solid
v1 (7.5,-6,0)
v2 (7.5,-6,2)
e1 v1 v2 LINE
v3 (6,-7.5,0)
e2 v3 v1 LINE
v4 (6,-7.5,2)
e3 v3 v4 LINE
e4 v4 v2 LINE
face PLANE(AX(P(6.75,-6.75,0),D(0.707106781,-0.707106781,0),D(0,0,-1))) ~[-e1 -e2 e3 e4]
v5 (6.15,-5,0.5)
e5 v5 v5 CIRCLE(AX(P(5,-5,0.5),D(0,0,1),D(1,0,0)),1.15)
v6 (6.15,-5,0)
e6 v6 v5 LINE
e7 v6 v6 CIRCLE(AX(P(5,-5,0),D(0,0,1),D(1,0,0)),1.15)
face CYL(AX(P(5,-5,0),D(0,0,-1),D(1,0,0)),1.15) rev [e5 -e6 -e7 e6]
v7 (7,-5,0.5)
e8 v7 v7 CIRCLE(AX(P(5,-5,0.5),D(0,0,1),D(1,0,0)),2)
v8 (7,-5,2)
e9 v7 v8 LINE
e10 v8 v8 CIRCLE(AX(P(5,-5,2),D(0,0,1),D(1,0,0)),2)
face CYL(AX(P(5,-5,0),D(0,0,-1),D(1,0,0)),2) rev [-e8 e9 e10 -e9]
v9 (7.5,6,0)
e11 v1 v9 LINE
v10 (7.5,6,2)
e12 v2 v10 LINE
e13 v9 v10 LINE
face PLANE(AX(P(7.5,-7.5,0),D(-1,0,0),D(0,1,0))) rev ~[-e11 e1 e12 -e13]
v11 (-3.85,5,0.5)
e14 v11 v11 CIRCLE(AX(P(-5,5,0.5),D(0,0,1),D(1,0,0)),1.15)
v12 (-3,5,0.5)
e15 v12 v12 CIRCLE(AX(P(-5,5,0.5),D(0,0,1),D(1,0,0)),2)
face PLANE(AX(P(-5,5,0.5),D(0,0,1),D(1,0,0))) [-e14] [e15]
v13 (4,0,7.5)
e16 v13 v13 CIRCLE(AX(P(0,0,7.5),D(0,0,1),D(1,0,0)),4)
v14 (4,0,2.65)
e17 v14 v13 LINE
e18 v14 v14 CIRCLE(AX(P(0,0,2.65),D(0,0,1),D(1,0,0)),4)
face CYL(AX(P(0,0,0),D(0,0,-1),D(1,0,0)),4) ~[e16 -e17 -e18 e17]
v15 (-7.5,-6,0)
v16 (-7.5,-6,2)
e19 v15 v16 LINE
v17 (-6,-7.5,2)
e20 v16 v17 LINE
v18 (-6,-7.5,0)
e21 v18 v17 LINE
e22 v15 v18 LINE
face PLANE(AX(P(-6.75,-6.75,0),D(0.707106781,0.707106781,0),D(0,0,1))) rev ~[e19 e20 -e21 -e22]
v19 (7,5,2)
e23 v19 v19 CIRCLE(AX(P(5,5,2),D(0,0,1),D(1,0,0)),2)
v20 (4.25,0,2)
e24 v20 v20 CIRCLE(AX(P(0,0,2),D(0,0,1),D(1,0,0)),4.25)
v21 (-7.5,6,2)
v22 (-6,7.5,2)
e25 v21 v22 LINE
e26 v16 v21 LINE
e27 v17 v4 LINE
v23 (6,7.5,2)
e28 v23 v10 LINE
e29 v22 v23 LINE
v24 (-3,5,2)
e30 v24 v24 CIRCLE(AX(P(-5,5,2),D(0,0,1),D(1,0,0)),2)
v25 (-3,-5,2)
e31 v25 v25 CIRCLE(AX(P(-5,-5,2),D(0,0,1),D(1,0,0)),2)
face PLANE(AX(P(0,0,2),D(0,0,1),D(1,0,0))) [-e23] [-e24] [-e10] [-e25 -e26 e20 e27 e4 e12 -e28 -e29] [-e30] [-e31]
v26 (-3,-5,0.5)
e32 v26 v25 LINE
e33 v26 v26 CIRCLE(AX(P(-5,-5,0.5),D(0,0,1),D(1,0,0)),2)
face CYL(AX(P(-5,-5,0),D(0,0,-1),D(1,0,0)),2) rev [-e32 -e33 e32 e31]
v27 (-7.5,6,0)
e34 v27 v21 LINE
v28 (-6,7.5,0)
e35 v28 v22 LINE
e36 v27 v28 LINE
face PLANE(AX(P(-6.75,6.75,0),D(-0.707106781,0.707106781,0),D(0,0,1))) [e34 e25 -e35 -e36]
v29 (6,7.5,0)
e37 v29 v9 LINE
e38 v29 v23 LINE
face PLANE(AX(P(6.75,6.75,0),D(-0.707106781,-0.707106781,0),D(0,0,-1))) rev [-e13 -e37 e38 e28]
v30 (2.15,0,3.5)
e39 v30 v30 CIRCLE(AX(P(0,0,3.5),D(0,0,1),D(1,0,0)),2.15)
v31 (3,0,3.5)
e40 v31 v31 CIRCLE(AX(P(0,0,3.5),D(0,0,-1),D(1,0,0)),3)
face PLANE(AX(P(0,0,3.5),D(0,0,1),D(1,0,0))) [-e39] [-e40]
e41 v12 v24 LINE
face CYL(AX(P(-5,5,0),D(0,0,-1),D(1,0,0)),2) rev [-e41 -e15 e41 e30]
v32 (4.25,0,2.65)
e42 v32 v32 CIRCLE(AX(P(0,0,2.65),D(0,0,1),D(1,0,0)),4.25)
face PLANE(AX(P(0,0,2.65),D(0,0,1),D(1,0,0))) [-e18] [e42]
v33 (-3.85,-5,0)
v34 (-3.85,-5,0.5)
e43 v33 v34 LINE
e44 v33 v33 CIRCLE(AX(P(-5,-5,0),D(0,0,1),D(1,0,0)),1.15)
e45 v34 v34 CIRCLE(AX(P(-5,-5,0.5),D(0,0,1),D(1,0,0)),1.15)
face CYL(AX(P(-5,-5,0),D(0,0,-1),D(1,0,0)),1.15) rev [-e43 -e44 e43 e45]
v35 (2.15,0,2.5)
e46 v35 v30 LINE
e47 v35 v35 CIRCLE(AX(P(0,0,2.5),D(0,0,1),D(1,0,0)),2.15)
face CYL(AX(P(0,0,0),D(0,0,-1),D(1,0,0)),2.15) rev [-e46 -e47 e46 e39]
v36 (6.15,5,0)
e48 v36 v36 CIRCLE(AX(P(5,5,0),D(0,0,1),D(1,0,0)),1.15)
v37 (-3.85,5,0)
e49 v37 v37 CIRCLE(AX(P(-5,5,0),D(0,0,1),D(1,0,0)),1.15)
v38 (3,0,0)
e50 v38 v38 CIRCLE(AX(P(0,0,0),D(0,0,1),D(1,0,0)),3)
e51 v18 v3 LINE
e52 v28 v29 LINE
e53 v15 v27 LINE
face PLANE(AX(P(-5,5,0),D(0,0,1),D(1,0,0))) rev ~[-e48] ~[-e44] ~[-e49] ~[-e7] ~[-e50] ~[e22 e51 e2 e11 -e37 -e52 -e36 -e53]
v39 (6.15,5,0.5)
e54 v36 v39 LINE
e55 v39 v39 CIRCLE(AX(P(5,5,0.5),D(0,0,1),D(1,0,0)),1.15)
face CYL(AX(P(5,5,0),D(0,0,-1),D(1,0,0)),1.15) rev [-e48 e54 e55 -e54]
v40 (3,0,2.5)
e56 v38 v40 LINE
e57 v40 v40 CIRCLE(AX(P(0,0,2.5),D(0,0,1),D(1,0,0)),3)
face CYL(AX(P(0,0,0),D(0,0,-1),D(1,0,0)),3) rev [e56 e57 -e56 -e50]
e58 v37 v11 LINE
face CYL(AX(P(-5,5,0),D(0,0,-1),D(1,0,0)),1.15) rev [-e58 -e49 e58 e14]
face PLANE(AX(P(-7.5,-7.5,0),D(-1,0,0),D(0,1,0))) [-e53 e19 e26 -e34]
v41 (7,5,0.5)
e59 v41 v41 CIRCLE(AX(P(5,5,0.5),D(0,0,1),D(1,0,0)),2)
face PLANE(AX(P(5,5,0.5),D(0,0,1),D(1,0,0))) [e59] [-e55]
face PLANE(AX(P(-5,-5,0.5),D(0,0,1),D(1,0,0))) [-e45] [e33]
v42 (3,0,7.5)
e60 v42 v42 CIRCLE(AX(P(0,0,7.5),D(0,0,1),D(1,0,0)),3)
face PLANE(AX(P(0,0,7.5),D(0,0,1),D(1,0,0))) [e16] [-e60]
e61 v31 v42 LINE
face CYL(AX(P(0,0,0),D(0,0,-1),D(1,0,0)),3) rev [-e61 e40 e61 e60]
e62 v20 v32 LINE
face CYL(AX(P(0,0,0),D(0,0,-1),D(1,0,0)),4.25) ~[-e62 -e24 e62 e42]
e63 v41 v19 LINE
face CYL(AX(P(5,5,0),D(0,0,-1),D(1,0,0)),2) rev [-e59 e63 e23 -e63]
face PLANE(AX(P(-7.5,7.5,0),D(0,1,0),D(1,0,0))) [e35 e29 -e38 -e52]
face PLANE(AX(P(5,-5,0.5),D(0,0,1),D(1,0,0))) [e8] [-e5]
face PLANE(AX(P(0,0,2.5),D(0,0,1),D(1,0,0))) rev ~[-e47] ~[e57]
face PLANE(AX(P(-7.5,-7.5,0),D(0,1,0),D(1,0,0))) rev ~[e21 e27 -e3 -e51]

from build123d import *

# Parameters (mm, degrees)
F0_W     = 15
F0_H     = 15
F0_R     = 2
F0_R_2   = 4.25
F1_DEPTH = 2
F0_R_3   = 4
F2_DEPTH = 2.65
F0_R_4   = 3.7599999923
F0_R_5   = 3
F3_DEPTH = 7.5
F0_R_6   = 2.15
F4_DEPTH = 3.5
F5_DEPTH = 2.5
F6_SIZE  = 1.5
F0_R_7   = 1.15
F7_DEPTH = 0.5


with BuildPart() as f1:
    # F0 (on Top) → F1 (new body)
    with BuildSketch(Plane.XY):
        Rectangle(F0_W, F0_H)
        with Locations((-5, -5)):
            Circle(F0_R, mode=Mode.SUBTRACT)
        with Locations((5, -5)):
            Circle(F0_R, mode=Mode.SUBTRACT)
        with Locations((-5, 5)):
            Circle(F0_R, mode=Mode.SUBTRACT)
        Circle(F0_R_2, mode=Mode.SUBTRACT)
        with Locations((5, 5)):
            Circle(F0_R, mode=Mode.SUBTRACT)
    extrude(amount=F1_DEPTH)

    # F0 (on Top) → F2 (join)
    with BuildSketch(Plane.XY):
        Circle(F0_R_2)
        Circle(F0_R_3, mode=Mode.SUBTRACT)
    extrude(amount=F2_DEPTH)

    # F0 (on Top) → F3 (join)
    with BuildSketch(Plane.XY):
        Circle(F0_R_3)
        Circle(F0_R_4, mode=Mode.SUBTRACT)
        Circle(F0_R_4)
        Circle(F0_R_5, mode=Mode.SUBTRACT)
    extrude(amount=F3_DEPTH)

    # F0 (on Top) → F4 (join)
    with BuildSketch(Plane.XY):
        Circle(F0_R_4)
        Circle(F0_R_5, mode=Mode.SUBTRACT)
        Circle(F0_R_5)
        Circle(F0_R_6, mode=Mode.SUBTRACT)
    extrude(amount=F4_DEPTH)

    # F0 (on Top) → F5 (cut)
    with BuildSketch(Plane.XY):
        Circle(F0_R_5)
        Circle(F0_R_6, mode=Mode.SUBTRACT)
    extrude(amount=F5_DEPTH, mode=Mode.SUBTRACT)

    # F6
    f6_edges = [f1.edges().sort_by_distance(p)[0] for p in [
        (7.5, -7.5, 1),
        (7.5, 7.5, 1),
        (-7.5, -7.5, 1),
        (-7.5, 7.5, 1),
    ]]
    chamfer(f6_edges, length=F6_SIZE)

    # F0 (on Top) → F7 (join)
    with BuildSketch(Plane.XY):
        with Locations((-5, 5)):
            Circle(F0_R)
        with Locations((-5, 5)):
            Circle(F0_R_7, mode=Mode.SUBTRACT)
        with Locations((5, 5)):
            Circle(F0_R)
        with Locations((5, 5)):
            Circle(F0_R_7, mode=Mode.SUBTRACT)
        with Locations((5, -5)):
            Circle(F0_R)
        with Locations((5, -5)):
            Circle(F0_R_7, mode=Mode.SUBTRACT)
        with Locations((-5, -5)):
            Circle(F0_R)
        with Locations((-5, -5)):
            Circle(F0_R_7, mode=Mode.SUBTRACT)
    extrude(amount=F7_DEPTH)


solid = f1.part
